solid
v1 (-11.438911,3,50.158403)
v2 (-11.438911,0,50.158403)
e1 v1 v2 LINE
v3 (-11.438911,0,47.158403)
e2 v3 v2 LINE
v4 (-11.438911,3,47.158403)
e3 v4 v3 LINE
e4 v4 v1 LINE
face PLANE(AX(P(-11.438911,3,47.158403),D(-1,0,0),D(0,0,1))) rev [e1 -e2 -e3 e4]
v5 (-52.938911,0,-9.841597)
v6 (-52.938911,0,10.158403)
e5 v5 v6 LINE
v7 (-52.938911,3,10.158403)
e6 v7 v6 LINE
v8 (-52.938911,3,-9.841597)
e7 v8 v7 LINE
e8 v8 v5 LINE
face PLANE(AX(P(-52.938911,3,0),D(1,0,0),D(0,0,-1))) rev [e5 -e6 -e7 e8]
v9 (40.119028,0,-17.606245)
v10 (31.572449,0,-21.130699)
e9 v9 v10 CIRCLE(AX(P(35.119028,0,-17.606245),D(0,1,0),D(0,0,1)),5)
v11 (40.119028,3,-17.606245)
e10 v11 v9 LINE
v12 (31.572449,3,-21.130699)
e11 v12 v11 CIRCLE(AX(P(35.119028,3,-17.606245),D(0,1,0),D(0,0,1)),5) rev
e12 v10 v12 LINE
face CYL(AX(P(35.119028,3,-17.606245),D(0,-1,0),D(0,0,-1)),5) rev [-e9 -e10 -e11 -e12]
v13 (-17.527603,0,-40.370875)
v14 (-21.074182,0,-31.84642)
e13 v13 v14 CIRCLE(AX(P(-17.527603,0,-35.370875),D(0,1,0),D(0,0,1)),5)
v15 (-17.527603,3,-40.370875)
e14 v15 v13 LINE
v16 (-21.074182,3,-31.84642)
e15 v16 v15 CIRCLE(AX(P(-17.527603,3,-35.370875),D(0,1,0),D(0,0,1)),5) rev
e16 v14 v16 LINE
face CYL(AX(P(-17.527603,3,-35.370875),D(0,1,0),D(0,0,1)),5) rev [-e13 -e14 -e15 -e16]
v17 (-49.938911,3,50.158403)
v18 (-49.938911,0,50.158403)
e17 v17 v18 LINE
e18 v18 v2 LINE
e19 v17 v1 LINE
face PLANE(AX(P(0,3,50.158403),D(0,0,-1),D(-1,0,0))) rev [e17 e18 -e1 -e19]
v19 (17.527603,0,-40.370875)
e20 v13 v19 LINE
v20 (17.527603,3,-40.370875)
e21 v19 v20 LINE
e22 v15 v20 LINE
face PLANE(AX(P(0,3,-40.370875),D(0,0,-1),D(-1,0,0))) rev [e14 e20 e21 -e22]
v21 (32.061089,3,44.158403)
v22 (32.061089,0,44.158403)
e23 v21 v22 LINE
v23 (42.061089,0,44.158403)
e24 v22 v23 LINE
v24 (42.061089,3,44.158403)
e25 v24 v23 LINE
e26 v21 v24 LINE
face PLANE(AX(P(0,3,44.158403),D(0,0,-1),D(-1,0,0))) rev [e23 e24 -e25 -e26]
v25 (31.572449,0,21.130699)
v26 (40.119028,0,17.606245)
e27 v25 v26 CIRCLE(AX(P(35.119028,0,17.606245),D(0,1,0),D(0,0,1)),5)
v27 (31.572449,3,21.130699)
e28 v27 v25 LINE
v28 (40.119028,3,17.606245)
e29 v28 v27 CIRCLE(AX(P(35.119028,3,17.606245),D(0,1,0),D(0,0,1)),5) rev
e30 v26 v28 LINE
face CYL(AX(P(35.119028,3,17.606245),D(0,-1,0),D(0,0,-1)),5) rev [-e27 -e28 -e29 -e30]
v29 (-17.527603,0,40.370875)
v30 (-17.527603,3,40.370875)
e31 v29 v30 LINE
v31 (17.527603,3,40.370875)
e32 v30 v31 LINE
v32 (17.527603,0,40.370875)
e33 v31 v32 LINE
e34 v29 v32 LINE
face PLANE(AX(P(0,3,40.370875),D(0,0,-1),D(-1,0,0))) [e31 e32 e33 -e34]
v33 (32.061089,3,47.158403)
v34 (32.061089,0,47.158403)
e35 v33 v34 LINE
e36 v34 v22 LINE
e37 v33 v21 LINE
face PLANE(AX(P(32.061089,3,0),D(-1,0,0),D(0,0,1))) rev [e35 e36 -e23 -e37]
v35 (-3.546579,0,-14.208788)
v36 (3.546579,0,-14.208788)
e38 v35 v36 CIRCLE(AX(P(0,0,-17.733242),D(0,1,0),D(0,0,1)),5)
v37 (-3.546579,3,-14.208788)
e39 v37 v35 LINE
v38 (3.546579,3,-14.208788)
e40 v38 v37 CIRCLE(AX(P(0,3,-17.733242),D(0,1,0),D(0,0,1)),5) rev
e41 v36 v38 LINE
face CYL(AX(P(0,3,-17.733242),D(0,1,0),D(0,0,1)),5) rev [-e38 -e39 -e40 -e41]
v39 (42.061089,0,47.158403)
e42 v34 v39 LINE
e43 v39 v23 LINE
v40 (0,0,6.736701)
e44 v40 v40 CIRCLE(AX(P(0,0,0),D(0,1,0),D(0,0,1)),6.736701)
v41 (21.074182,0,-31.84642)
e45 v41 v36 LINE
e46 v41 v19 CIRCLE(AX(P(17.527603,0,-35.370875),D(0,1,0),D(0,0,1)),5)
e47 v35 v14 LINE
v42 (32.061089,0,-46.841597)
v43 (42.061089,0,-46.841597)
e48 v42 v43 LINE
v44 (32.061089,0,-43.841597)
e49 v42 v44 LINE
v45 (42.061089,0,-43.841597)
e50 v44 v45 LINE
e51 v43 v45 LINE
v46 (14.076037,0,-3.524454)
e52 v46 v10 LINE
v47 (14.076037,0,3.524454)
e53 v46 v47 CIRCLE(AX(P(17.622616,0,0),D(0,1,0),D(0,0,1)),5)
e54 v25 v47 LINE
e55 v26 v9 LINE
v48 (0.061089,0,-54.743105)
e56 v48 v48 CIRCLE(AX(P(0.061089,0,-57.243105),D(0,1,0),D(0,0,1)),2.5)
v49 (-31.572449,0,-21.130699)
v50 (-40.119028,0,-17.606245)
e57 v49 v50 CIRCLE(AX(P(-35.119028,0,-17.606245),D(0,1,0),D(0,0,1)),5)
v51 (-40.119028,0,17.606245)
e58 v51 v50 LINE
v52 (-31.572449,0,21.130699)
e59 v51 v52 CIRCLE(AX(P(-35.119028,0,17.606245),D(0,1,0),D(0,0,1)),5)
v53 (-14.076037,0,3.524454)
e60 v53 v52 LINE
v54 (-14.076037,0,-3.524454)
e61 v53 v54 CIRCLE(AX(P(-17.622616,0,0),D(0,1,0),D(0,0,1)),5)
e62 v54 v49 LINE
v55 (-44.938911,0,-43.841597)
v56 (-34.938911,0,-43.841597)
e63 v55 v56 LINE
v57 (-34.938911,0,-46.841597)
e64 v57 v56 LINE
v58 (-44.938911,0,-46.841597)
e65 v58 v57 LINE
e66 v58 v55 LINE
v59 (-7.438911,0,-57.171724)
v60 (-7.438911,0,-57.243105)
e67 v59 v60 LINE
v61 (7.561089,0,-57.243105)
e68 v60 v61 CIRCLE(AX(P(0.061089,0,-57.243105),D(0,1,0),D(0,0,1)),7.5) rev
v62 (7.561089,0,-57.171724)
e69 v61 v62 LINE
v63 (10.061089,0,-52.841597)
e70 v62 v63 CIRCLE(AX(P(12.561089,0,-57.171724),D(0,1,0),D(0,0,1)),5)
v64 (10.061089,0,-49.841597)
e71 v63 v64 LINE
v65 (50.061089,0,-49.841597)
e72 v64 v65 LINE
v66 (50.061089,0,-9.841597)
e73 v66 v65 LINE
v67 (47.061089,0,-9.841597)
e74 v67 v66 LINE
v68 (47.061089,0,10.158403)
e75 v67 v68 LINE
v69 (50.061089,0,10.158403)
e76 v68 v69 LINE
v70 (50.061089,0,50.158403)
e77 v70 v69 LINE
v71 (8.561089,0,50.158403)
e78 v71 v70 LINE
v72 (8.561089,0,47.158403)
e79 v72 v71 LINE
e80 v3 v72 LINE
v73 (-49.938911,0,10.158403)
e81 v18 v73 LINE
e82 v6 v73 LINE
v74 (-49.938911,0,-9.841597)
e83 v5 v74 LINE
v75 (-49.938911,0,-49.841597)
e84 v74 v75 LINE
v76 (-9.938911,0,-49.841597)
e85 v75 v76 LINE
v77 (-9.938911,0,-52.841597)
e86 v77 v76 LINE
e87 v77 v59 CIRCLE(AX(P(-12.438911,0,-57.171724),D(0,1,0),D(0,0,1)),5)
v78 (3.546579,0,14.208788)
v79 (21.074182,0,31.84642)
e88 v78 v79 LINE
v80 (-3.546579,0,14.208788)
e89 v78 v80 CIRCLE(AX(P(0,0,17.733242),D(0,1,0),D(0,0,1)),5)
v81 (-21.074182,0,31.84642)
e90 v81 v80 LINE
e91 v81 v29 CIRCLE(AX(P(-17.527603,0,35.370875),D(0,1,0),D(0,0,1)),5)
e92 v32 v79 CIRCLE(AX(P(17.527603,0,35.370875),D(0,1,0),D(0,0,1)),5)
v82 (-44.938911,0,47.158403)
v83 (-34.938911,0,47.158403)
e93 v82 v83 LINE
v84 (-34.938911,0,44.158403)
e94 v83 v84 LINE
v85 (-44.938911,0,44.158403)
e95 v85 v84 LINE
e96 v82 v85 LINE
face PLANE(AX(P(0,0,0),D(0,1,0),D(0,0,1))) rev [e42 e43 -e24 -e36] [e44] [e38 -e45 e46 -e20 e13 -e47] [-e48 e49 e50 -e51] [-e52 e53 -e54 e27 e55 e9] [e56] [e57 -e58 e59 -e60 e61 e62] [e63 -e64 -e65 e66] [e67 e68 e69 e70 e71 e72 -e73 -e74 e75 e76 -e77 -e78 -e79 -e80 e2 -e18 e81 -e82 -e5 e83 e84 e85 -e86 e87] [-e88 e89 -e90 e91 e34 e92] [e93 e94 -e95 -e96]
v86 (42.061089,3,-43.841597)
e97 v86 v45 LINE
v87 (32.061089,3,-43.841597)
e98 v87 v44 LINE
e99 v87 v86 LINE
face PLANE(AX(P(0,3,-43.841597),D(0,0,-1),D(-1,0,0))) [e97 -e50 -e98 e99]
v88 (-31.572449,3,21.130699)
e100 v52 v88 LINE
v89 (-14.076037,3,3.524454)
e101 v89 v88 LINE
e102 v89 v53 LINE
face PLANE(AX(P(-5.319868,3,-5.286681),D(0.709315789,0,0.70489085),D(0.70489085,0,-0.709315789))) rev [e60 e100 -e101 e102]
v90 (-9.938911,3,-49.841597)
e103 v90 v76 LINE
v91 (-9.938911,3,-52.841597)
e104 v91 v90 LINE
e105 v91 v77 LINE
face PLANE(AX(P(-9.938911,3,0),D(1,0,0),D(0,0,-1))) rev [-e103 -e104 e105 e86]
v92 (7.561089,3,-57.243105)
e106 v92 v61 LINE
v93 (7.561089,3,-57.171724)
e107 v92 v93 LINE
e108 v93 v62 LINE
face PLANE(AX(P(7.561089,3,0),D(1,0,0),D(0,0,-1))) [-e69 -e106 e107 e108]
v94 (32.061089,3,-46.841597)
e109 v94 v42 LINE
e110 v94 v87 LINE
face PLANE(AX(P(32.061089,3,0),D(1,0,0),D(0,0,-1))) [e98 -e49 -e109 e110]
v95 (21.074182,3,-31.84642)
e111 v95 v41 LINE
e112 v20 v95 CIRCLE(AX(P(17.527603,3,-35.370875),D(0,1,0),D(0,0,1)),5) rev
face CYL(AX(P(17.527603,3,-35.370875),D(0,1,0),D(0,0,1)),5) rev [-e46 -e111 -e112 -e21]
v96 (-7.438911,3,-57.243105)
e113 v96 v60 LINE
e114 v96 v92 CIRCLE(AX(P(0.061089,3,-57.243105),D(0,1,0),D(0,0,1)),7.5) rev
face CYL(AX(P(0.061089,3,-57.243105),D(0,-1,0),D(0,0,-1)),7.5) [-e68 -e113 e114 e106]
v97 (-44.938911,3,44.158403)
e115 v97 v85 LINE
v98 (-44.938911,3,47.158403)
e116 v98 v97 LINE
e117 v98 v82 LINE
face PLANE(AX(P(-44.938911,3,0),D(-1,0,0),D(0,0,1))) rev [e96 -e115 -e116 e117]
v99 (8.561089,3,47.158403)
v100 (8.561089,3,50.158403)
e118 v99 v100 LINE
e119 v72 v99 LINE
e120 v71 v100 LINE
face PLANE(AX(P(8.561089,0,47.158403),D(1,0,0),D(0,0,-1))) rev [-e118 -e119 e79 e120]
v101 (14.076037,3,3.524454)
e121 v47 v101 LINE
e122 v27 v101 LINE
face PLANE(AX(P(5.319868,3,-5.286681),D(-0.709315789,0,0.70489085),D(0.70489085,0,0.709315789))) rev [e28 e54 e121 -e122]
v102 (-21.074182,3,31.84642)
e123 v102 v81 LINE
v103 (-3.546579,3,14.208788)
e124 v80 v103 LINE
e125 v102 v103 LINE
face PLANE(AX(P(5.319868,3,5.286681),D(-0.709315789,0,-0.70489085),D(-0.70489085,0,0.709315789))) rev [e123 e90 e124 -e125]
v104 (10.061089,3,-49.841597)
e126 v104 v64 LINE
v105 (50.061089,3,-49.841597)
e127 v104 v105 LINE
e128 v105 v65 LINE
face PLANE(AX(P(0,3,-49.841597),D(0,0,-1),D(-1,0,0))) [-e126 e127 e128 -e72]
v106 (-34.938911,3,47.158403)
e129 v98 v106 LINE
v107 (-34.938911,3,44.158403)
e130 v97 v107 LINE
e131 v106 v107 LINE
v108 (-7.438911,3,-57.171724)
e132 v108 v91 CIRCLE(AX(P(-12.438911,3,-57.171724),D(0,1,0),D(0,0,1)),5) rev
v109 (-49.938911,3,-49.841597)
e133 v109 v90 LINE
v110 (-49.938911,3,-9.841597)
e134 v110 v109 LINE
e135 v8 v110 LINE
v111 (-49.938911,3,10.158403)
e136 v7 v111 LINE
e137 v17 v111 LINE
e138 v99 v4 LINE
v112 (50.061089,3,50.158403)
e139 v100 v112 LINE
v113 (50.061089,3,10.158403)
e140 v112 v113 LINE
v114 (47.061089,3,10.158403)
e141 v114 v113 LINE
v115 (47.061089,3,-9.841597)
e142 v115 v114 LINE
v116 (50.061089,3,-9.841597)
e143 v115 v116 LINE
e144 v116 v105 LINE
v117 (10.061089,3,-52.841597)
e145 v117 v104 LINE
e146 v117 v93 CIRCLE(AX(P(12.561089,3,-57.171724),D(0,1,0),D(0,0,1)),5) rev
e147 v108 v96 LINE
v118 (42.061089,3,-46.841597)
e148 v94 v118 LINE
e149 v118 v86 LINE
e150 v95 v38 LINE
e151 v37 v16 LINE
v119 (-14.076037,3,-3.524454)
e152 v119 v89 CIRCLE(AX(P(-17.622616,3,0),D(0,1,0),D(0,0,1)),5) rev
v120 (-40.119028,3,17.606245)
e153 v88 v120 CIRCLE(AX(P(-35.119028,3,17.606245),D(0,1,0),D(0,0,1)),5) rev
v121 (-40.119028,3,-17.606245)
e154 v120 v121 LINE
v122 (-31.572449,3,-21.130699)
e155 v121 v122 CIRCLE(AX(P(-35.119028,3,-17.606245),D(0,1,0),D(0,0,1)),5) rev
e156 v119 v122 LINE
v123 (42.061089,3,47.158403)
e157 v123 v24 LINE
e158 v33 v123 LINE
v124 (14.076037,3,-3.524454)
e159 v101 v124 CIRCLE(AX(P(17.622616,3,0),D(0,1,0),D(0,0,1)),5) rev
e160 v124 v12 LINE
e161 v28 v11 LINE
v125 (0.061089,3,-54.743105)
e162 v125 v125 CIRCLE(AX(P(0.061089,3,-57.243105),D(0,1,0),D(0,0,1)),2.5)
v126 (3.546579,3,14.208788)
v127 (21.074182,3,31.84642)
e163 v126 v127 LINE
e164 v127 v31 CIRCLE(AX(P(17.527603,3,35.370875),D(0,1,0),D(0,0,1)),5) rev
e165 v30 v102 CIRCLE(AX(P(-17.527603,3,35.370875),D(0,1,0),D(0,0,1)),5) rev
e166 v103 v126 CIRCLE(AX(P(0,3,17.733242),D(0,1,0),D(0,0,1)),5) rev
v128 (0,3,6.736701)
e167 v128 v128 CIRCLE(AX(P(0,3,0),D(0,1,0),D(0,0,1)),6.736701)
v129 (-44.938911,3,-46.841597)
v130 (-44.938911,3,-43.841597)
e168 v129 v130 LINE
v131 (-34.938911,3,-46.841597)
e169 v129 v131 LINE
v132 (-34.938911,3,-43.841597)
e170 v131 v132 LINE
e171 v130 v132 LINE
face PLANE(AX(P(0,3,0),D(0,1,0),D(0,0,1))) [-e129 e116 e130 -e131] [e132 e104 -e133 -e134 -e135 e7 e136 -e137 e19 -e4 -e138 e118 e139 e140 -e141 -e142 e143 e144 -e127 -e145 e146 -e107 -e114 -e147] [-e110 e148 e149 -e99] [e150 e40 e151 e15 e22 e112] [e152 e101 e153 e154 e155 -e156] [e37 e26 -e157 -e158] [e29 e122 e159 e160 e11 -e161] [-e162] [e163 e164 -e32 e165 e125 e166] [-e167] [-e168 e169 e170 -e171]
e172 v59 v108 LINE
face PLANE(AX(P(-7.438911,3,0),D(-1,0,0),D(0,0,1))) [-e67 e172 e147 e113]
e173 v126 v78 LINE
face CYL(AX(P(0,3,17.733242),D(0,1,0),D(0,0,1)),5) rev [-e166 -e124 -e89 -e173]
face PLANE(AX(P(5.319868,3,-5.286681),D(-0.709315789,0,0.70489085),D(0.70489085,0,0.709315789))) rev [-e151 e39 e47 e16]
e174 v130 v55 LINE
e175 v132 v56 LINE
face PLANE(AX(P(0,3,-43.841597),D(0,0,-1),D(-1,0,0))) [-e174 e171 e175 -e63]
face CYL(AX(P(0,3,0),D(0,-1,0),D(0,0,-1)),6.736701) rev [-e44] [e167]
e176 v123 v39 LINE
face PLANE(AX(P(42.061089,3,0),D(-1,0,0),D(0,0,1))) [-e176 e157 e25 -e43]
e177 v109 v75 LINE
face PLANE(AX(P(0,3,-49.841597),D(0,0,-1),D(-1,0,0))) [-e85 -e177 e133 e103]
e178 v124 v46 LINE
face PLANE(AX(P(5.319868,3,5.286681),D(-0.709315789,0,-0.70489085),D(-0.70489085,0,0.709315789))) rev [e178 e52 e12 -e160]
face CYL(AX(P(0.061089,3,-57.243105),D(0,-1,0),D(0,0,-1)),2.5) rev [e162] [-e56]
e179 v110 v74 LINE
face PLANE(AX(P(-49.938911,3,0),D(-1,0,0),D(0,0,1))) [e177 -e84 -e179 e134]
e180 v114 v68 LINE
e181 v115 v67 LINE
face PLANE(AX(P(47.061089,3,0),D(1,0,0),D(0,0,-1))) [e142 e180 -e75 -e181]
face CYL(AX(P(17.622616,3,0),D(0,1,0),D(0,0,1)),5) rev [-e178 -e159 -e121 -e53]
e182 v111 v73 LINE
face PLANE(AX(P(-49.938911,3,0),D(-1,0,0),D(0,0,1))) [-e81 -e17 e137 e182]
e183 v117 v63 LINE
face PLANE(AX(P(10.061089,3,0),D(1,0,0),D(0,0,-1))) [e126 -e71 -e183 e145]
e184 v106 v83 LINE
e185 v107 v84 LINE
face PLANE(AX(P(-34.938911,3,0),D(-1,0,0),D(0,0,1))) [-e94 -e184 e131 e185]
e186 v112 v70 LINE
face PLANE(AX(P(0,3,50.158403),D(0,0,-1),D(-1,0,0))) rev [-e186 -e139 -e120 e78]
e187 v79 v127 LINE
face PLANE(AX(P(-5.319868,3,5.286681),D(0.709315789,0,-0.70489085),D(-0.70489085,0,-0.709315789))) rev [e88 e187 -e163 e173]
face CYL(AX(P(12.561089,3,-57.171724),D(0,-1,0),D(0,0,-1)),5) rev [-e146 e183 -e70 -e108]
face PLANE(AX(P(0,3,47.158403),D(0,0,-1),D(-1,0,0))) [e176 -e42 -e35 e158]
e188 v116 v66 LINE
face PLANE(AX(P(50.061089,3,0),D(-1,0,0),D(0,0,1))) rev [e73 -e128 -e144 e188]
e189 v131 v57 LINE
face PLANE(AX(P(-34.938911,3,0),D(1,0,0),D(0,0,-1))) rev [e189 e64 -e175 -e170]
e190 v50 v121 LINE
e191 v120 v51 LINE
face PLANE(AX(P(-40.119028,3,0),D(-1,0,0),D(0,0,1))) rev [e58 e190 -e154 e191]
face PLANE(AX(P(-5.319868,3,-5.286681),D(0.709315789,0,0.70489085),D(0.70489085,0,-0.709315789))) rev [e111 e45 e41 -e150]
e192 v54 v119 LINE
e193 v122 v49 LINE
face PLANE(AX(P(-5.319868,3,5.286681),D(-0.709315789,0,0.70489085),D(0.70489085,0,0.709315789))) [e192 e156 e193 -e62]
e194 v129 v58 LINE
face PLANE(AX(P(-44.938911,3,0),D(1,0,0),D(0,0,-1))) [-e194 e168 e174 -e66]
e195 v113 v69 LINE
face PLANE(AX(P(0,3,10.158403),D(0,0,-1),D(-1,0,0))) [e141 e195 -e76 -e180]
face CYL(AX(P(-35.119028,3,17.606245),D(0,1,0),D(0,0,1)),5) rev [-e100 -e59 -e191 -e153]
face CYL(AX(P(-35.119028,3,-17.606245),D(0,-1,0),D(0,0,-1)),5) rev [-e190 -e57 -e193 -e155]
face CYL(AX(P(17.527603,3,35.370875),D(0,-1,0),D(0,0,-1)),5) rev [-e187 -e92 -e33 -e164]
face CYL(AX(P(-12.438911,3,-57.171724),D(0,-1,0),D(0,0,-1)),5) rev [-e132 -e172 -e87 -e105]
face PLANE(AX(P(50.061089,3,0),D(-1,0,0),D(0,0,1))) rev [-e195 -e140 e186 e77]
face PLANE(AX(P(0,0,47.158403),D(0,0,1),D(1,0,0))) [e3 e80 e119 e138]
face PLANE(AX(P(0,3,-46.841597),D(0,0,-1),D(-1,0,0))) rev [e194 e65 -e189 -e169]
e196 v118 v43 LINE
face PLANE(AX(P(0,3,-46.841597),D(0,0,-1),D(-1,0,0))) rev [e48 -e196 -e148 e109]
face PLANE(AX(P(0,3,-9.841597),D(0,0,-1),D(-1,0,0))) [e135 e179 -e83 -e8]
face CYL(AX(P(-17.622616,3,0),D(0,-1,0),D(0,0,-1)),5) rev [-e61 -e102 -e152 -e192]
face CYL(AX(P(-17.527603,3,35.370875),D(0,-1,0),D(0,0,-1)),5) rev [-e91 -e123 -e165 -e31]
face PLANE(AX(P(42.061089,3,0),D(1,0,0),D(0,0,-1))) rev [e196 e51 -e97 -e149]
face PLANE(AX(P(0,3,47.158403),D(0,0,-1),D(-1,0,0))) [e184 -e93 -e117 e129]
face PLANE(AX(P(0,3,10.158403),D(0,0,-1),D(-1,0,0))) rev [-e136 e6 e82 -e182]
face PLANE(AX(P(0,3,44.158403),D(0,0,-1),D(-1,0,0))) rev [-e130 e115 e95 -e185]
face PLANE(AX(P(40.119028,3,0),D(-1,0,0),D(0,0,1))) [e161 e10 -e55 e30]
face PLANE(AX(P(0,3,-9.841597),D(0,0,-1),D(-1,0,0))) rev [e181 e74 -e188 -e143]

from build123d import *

# Parameters (mm, degrees)
SKETCH1_R           = 6.736700536
SKETCH1_W           = 10
SKETCH1_H           = 3
SKETCH1_R_2         = 2.5
BOSS_EXTRUDE1_DEPTH = 3
FILLET1_R           = 5
SKETCH5_W           = 20
SKETCH5_H           = 3
CUT_EXTRUDE1_DEPTH  = 3


with BuildPart() as part:
    # Sketch1 → Boss-Extrude1 (new body)
    with BuildSketch(Plane(origin=(0, 0, 0), x_dir=(1, 0, 0), z_dir=(0, 1, 0))):
        with BuildLine():
            Line((-49.938910977, -10.158402567), (-49.938910977, -50.158402567))
            Line((-49.938910977, -50.158402567), (50.061089023, -50.158402567))
            Line((50.061089023, -50.158402567), (50.061089023, -10.158402567))
            Line((50.061089023, -10.158402567), (47.061089023, -10.158402567))
            Line((47.061089023, -10.158402567), (47.061089023, 9.841597433))
            Line((47.061089023, 9.841597433), (50.061089023, 9.841597433))
            Line((50.061089023, 9.841597433), (50.061089023, 49.841597433))
            Line((50.061089023, 49.841597433), (10.061089023, 49.841597433))
            Line((10.061089023, 49.841597433), (10.061089023, 52.841597433))
            Line((10.061089023, 52.841597433), (7.561089023, 52.841597433))
            Line((7.561089023, 52.841597433), (7.561089023, 57.243104586))
            ThreePointArc((7.561089023, 57.243104586), (0.061089023, 64.743104586), (-7.438910977, 57.243104586))
            Line((-7.438910977, 57.243104586), (-7.438910977, 52.841597433))
            Line((-7.438910977, 52.841597433), (-9.938910977, 52.841597433))
            Line((-9.938910977, 52.841597433), (-9.938910977, 49.841597433))
            Line((-9.938910977, 49.841597433), (-49.938910977, 49.841597433))
            Line((-49.938910977, 49.841597433), (-49.938910977, 9.841597433))
            Line((-49.938910977, 9.841597433), (-52.938910977, 9.841597433))
            Line((-52.938910977, 9.841597433), (-52.938910977, -10.158402567))
            Line((-52.938910977, -10.158402567), (-49.938910977, -10.158402567))
        make_face()
        Polygon((-40.119028072, -29.730929333), (-40.119028072, 29.730929333), (-10.573569788, 0), align=None, mode=Mode.SUBTRACT)
        Polygon((-29.545458284, 40.370874503), (29.545458284, 40.370874503), (0, 10.63994517), align=None, mode=Mode.SUBTRACT)
        Polygon((40.119028072, 29.730929333), (40.119028072, -29.730929333), (10.573569788, 0), align=None, mode=Mode.SUBTRACT)
        Polygon((29.545458284, -40.370874503), (-29.545458284, -40.370874503), (0, -10.63994517), align=None, mode=Mode.SUBTRACT)
        with Locations(Location((0, 0, 0), (0, 0, 270))):
            Circle(SKETCH1_R, mode=Mode.SUBTRACT)
        with Locations((-39.938910977, -45.658402567)):
            Rectangle(SKETCH1_W, SKETCH1_H, mode=Mode.SUBTRACT)
        with Locations((37.061089023, -45.658402567)):
            Rectangle(SKETCH1_W, SKETCH1_H, mode=Mode.SUBTRACT)
        with Locations((-39.938910977, 45.341597433)):
            Rectangle(SKETCH1_W, SKETCH1_H, mode=Mode.SUBTRACT)
        with Locations(Location((0.061089023, 57.243104586, 0), (0, 0, 270))):
            Circle(SKETCH1_R_2, mode=Mode.SUBTRACT)
        with Locations((37.061089023, 45.341597433)):
            Rectangle(SKETCH1_W, SKETCH1_H, mode=Mode.SUBTRACT)
    extrude(amount=BOSS_EXTRUDE1_DEPTH)

    # Fillet1
    # the kernel refuses this fillet: 5 mm, written as the material it adds along each edge
    with BuildSketch(Plane(origin=(7.561089023, 0, -52.841597433), x_dir=(1, 0, 0), z_dir=(0, 1, 0))) as fillet1_piece_1:
        with BuildLine():
            CenterArc((5, 4.330127019), FILLET1_R, 180, 60)
            Line((0, 4.330127019), (-0.1, 4.330127019))
            Line((-0.1, 4.330127019), (-0.1, 0))
            Line((-0.1, 0), (0, -0.1))
            ThreePointArc((0, -0.1), (1.25, -0.1), (2.45, -0.08660254))
            Line((2.45, -0.08660254), (2.5, 0))
        make_face()
    extrude(amount=3)
    # the kernel refuses this fillet: 5 mm, written as the material it adds along each edge
    with BuildSketch(Plane(origin=(-7.438910977, 0, -52.841597433), x_dir=(-1, 0, 0), z_dir=(0, 1, 0))) as fillet1_2_piece_1:
        with BuildLine():
            CenterArc((5, -4.330127019), FILLET1_R, 120, 60)
            Line((0, -4.330127019), (-0.1, -4.330127019))
            Line((-0.1, -4.330127019), (-0.1, 0))
            Line((-0.1, 0), (0, 0.1))
            ThreePointArc((0, 0.1), (1.25, 0.1), (2.45, 0.08660254))
            Line((2.45, 0.08660254), (2.5, 0))
        make_face()
    extrude(amount=3)
    # the kernel refuses this fillet: 5 mm, written as the material it adds along each edge
    with BuildSketch(Plane(origin=(-10.573569788, 0, 0), x_dir=(-0.7048908504671988, 0, 0.7093157892840319), z_dir=(0, 1, 0))) as fillet1_3_piece_1:
        with BuildLine():
            CenterArc((FILLET1_R * 0.993761680081, -FILLET1_R), FILLET1_R, 90, 89.6414534)
            Line((-FILLET1_R * 0.00621873983502, -FILLET1_R * 0.993742222145), (-FILLET1_R * 0.0262183482333, -FILLET1_R * 0.993617066588))
            Line((-FILLET1_R * 0.0262183482333, -FILLET1_R * 0.993617066588), (-FILLET1_R * 0.0198752336016, FILLET1_R * 0.02))
            Line((-FILLET1_R * 0.0198752336016, FILLET1_R * 0.02), (FILLET1_R * 0.993761680081, FILLET1_R * 0.02))
            Line((FILLET1_R * 0.993761680081, FILLET1_R * 0.02), (FILLET1_R * 0.993761680081, 0))
        make_face()
    extrude(amount=3)
    # the kernel refuses this fillet: 5 mm, written as the material it adds along each edge
    with BuildSketch(Plane(origin=(-40.119028072, 0, 29.730929333), x_dir=(0, 0, -1), z_dir=(0, 1, 0))) as fillet1_4_piece_1:
        with BuildLine():
            CenterArc((FILLET1_R * 2.42493683689, -FILLET1_R), FILLET1_R, 90, 135.1792733)
            Line((FILLET1_R * 1.72004598642, -FILLET1_R * 1.70931578928), (FILLET1_R * 1.70594816941, -FILLET1_R * 1.72350210507))
            Line((FILLET1_R * 1.70594816941, -FILLET1_R * 1.72350210507), (-FILLET1_R * 0.0140978170093, -FILLET1_R * 0.0141863157857))
            Line((-FILLET1_R * 0.0140978170093, -FILLET1_R * 0.0141863157857), (0, FILLET1_R * 0.02))
            Line((0, FILLET1_R * 0.02), (FILLET1_R * 2.42493683689, FILLET1_R * 0.02))
            Line((FILLET1_R * 2.42493683689, FILLET1_R * 0.02), (FILLET1_R * 2.42493683689, 0))
        make_face()
    extrude(amount=3)
    # the kernel refuses this fillet: 5 mm, written as the material it adds along each edge
    with BuildSketch(Plane(origin=(-40.119028072, 0, -29.730929333), x_dir=(0, 0, 1), z_dir=(0, 1, 0))) as fillet1_5_piece_1:
        with BuildLine():
            CenterArc((FILLET1_R * 2.42493683689, FILLET1_R), FILLET1_R, 134.8207267, 135.1792733)
            Line((FILLET1_R * 1.72004598642, FILLET1_R * 1.70931578928), (FILLET1_R * 1.70594816941, FILLET1_R * 1.72350210507))
            Line((FILLET1_R * 1.70594816941, FILLET1_R * 1.72350210507), (-FILLET1_R * 0.0140978170093, FILLET1_R * 0.0141863157857))
            Line((-FILLET1_R * 0.0140978170093, FILLET1_R * 0.0141863157857), (0, -FILLET1_R * 0.02))
            Line((0, -FILLET1_R * 0.02), (FILLET1_R * 2.42493683689, -FILLET1_R * 0.02))
            Line((FILLET1_R * 2.42493683689, -FILLET1_R * 0.02), (FILLET1_R * 2.42493683689, 0))
        make_face()
    extrude(amount=3)
    # the kernel refuses this fillet: 5 mm, written as the material it adds along each edge
    with BuildSketch(Plane(origin=(-29.545458284, 0, -40.370874503), x_dir=(1, 0, 0), z_dir=(0, 1, 0))) as fillet1_6_piece_1:
        with BuildLine():
            CenterArc((FILLET1_R * 2.4035709852, -FILLET1_R), FILLET1_R, 90, 134.8207267)
            Line((FILLET1_R * 1.69425519592, -FILLET1_R * 1.70489085047), (FILLET1_R * 1.68006888013, -FILLET1_R * 1.71898866748))
            Line((FILLET1_R * 1.68006888013, -FILLET1_R * 1.71898866748), (-FILLET1_R * 0.0141863157857, -FILLET1_R * 0.0140978170093))
            Line((-FILLET1_R * 0.0141863157857, -FILLET1_R * 0.0140978170093), (0, FILLET1_R * 0.02))
            Line((0, FILLET1_R * 0.02), (FILLET1_R * 2.4035709852, FILLET1_R * 0.02))
            Line((FILLET1_R * 2.4035709852, FILLET1_R * 0.02), (FILLET1_R * 2.4035709852, 0))
        make_face()
    extrude(amount=3)
    # the kernel refuses this fillet: 5 mm, written as the material it adds along each edge
    with BuildSketch(Plane(origin=(29.545458284, 0, -40.370874503), x_dir=(-0.7048908504671981, 0, 0.7093157892840325), z_dir=(0, 1, 0))) as fillet1_7_piece_1:
        with BuildLine():
            CenterArc((FILLET1_R * 2.4035709852, -FILLET1_R), FILLET1_R, 90, 134.8207267)
            Line((FILLET1_R * 1.69425519592, -FILLET1_R * 1.70489085047), (FILLET1_R * 1.68006888013, -FILLET1_R * 1.71898866748))
            Line((FILLET1_R * 1.68006888013, -FILLET1_R * 1.71898866748), (-FILLET1_R * 0.0141863157857, -FILLET1_R * 0.0140978170093))
            Line((-FILLET1_R * 0.0141863157857, -FILLET1_R * 0.0140978170093), (0, FILLET1_R * 0.02))
            Line((0, FILLET1_R * 0.02), (FILLET1_R * 2.4035709852, FILLET1_R * 0.02))
            Line((FILLET1_R * 2.4035709852, FILLET1_R * 0.02), (FILLET1_R * 2.4035709852, 0))
        make_face()
    extrude(amount=3)
    # the kernel refuses this fillet: 5 mm, written as the material it adds along each edge
    with BuildSketch(Plane(origin=(0, 0, -10.63994517), x_dir=(0.7048908504671987, 0, -0.7093157892840322), z_dir=(0, 1, 0))) as fillet1_8_piece_1:
        with BuildLine():
            CenterArc((FILLET1_R * 1.00627748085, FILLET1_R), FILLET1_R, 179.6414534, 90.3585466)
            Line((FILLET1_R * 0.00629706093592, FILLET1_R * 1.00625777786), (-FILLET1_R * 0.0137025474624, FILLET1_R * 1.00638293341))
            Line((-FILLET1_R * 0.0137025474624, FILLET1_R * 1.00638293341), (-FILLET1_R * 0.020125549617, -FILLET1_R * 0.02))
            Line((-FILLET1_R * 0.020125549617, -FILLET1_R * 0.02), (FILLET1_R * 1.00627748085, -FILLET1_R * 0.02))
            Line((FILLET1_R * 1.00627748085, -FILLET1_R * 0.02), (FILLET1_R * 1.00627748085, 0))
        make_face()
    extrude(amount=3)
    # the kernel refuses this fillet: 5 mm, written as the material it adds along each edge
    with BuildSketch(Plane(origin=(40.119028072, 0, -29.730929333), x_dir=(0, 0, 1), z_dir=(0, 1, 0))) as fillet1_9_piece_1:
        with BuildLine():
            CenterArc((FILLET1_R * 2.42493683689, -FILLET1_R), FILLET1_R, 90, 135.1792733)
            Line((FILLET1_R * 1.72004598642, -FILLET1_R * 1.70931578928), (FILLET1_R * 1.70594816941, -FILLET1_R * 1.72350210507))
            Line((FILLET1_R * 1.70594816941, -FILLET1_R * 1.72350210507), (-FILLET1_R * 0.0140978170093, -FILLET1_R * 0.0141863157857))
            Line((-FILLET1_R * 0.0140978170093, -FILLET1_R * 0.0141863157857), (0, FILLET1_R * 0.02))
            Line((0, FILLET1_R * 0.02), (FILLET1_R * 2.42493683689, FILLET1_R * 0.02))
            Line((FILLET1_R * 2.42493683689, FILLET1_R * 0.02), (FILLET1_R * 2.42493683689, 0))
        make_face()
    extrude(amount=3)
    # the kernel refuses this fillet: 5 mm, written as the material it adds along each edge
    with BuildSketch(Plane(origin=(40.119028072, 0, 29.730929333), x_dir=(-0.7048908504671988, 0, -0.7093157892840319), z_dir=(0, 1, 0))) as fillet1_10_piece_1:
        with BuildLine():
            CenterArc((FILLET1_R * 2.42493683689, -FILLET1_R), FILLET1_R, 90, 135.1792733)
            Line((FILLET1_R * 1.72004598642, -FILLET1_R * 1.70931578928), (FILLET1_R * 1.70594816941, -FILLET1_R * 1.72350210507))
            Line((FILLET1_R * 1.70594816941, -FILLET1_R * 1.72350210507), (-FILLET1_R * 0.0140978170093, -FILLET1_R * 0.0141863157857))
            Line((-FILLET1_R * 0.0140978170093, -FILLET1_R * 0.0141863157857), (0, FILLET1_R * 0.02))
            Line((0, FILLET1_R * 0.02), (FILLET1_R * 2.42493683689, FILLET1_R * 0.02))
            Line((FILLET1_R * 2.42493683689, FILLET1_R * 0.02), (FILLET1_R * 2.42493683689, 0))
        make_face()
    extrude(amount=3)
    # the kernel refuses this fillet: 5 mm, written as the material it adds along each edge
    with BuildSketch(Plane(origin=(10.573569788, 0, 0), x_dir=(0.7048908504671986, 0, 0.7093157892840322), z_dir=(0, 1, 0))) as fillet1_11_piece_1:
        with BuildLine():
            CenterArc((FILLET1_R * 0.993761680081, FILLET1_R), FILLET1_R, 180.3585466, 89.6414534)
            Line((-FILLET1_R * 0.00621873983502, FILLET1_R * 0.993742222145), (-FILLET1_R * 0.0262183482333, FILLET1_R * 0.993617066588))
            Line((-FILLET1_R * 0.0262183482333, FILLET1_R * 0.993617066588), (-FILLET1_R * 0.0198752336016, -FILLET1_R * 0.02))
            Line((-FILLET1_R * 0.0198752336016, -FILLET1_R * 0.02), (FILLET1_R * 0.993761680081, -FILLET1_R * 0.02))
            Line((FILLET1_R * 0.993761680081, -FILLET1_R * 0.02), (FILLET1_R * 0.993761680081, 0))
        make_face()
    extrude(amount=3)
    # the kernel refuses this fillet: 5 mm, written as the material it adds along each edge
    with BuildSketch(Plane(origin=(0, 0, 10.63994517), x_dir=(0.7048908504671988, 0, 0.709315789284032), z_dir=(0, 1, 0))) as fillet1_12_piece_1:
        with BuildLine():
            CenterArc((FILLET1_R * 1.00627748085, -FILLET1_R), FILLET1_R, 90, 90.3585466)
            Line((FILLET1_R * 0.00629706093592, -FILLET1_R * 1.00625777786), (-FILLET1_R * 0.0137025474624, -FILLET1_R * 1.00638293341))
            Line((-FILLET1_R * 0.0137025474624, -FILLET1_R * 1.00638293341), (-FILLET1_R * 0.020125549617, FILLET1_R * 0.02))
            Line((-FILLET1_R * 0.020125549617, FILLET1_R * 0.02), (FILLET1_R * 1.00627748085, FILLET1_R * 0.02))
            Line((FILLET1_R * 1.00627748085, FILLET1_R * 0.02), (FILLET1_R * 1.00627748085, 0))
        make_face()
    extrude(amount=3)
    # the kernel refuses this fillet: 5 mm, written as the material it adds along each edge
    with BuildSketch(Plane(origin=(29.545458284, 0, 40.370874503), x_dir=(-1, 0, 0), z_dir=(0, 1, 0))) as fillet1_13_piece_1:
        with BuildLine():
            CenterArc((FILLET1_R * 2.4035709852, -FILLET1_R), FILLET1_R, 90, 134.8207267)
            Line((FILLET1_R * 1.69425519592, -FILLET1_R * 1.70489085047), (FILLET1_R * 1.68006888013, -FILLET1_R * 1.71898866748))
            Line((FILLET1_R * 1.68006888013, -FILLET1_R * 1.71898866748), (-FILLET1_R * 0.0141863157857, -FILLET1_R * 0.0140978170093))
            Line((-FILLET1_R * 0.0141863157857, -FILLET1_R * 0.0140978170093), (0, FILLET1_R * 0.02))
            Line((0, FILLET1_R * 0.02), (FILLET1_R * 2.4035709852, FILLET1_R * 0.02))
            Line((FILLET1_R * 2.4035709852, FILLET1_R * 0.02), (FILLET1_R * 2.4035709852, 0))
        make_face()
    extrude(amount=3)
    # the kernel refuses this fillet: 5 mm, written as the material it adds along each edge
    with BuildSketch(Plane(origin=(-29.545458284, 0, 40.370874503), x_dir=(1, 0, 0), z_dir=(0, 1, 0))) as fillet1_14_piece_1:
        with BuildLine():
            CenterArc((FILLET1_R * 2.4035709852, FILLET1_R), FILLET1_R, 135.1792733, 134.8207267)
            Line((FILLET1_R * 1.69425519592, FILLET1_R * 1.70489085047), (FILLET1_R * 1.68006888013, FILLET1_R * 1.71898866748))
            Line((FILLET1_R * 1.68006888013, FILLET1_R * 1.71898866748), (-FILLET1_R * 0.0141863157857, FILLET1_R * 0.0140978170093))
            Line((-FILLET1_R * 0.0141863157857, FILLET1_R * 0.0140978170093), (0, -FILLET1_R * 0.02))
            Line((0, -FILLET1_R * 0.02), (FILLET1_R * 2.4035709852, -FILLET1_R * 0.02))
            Line((FILLET1_R * 2.4035709852, -FILLET1_R * 0.02), (FILLET1_R * 2.4035709852, 0))
        make_face()
    extrude(amount=3)

    # Sketch5 → Cut-Extrude1 (cut)
    with BuildSketch(Plane.XY.offset(50.158402567)):
        with Locations((-1.438910977, 1.5)):
            Rectangle(SKETCH5_W, SKETCH5_H)
    extrude(amount=-CUT_EXTRUDE1_DEPTH, mode=Mode.SUBTRACT)


solid = part.part
